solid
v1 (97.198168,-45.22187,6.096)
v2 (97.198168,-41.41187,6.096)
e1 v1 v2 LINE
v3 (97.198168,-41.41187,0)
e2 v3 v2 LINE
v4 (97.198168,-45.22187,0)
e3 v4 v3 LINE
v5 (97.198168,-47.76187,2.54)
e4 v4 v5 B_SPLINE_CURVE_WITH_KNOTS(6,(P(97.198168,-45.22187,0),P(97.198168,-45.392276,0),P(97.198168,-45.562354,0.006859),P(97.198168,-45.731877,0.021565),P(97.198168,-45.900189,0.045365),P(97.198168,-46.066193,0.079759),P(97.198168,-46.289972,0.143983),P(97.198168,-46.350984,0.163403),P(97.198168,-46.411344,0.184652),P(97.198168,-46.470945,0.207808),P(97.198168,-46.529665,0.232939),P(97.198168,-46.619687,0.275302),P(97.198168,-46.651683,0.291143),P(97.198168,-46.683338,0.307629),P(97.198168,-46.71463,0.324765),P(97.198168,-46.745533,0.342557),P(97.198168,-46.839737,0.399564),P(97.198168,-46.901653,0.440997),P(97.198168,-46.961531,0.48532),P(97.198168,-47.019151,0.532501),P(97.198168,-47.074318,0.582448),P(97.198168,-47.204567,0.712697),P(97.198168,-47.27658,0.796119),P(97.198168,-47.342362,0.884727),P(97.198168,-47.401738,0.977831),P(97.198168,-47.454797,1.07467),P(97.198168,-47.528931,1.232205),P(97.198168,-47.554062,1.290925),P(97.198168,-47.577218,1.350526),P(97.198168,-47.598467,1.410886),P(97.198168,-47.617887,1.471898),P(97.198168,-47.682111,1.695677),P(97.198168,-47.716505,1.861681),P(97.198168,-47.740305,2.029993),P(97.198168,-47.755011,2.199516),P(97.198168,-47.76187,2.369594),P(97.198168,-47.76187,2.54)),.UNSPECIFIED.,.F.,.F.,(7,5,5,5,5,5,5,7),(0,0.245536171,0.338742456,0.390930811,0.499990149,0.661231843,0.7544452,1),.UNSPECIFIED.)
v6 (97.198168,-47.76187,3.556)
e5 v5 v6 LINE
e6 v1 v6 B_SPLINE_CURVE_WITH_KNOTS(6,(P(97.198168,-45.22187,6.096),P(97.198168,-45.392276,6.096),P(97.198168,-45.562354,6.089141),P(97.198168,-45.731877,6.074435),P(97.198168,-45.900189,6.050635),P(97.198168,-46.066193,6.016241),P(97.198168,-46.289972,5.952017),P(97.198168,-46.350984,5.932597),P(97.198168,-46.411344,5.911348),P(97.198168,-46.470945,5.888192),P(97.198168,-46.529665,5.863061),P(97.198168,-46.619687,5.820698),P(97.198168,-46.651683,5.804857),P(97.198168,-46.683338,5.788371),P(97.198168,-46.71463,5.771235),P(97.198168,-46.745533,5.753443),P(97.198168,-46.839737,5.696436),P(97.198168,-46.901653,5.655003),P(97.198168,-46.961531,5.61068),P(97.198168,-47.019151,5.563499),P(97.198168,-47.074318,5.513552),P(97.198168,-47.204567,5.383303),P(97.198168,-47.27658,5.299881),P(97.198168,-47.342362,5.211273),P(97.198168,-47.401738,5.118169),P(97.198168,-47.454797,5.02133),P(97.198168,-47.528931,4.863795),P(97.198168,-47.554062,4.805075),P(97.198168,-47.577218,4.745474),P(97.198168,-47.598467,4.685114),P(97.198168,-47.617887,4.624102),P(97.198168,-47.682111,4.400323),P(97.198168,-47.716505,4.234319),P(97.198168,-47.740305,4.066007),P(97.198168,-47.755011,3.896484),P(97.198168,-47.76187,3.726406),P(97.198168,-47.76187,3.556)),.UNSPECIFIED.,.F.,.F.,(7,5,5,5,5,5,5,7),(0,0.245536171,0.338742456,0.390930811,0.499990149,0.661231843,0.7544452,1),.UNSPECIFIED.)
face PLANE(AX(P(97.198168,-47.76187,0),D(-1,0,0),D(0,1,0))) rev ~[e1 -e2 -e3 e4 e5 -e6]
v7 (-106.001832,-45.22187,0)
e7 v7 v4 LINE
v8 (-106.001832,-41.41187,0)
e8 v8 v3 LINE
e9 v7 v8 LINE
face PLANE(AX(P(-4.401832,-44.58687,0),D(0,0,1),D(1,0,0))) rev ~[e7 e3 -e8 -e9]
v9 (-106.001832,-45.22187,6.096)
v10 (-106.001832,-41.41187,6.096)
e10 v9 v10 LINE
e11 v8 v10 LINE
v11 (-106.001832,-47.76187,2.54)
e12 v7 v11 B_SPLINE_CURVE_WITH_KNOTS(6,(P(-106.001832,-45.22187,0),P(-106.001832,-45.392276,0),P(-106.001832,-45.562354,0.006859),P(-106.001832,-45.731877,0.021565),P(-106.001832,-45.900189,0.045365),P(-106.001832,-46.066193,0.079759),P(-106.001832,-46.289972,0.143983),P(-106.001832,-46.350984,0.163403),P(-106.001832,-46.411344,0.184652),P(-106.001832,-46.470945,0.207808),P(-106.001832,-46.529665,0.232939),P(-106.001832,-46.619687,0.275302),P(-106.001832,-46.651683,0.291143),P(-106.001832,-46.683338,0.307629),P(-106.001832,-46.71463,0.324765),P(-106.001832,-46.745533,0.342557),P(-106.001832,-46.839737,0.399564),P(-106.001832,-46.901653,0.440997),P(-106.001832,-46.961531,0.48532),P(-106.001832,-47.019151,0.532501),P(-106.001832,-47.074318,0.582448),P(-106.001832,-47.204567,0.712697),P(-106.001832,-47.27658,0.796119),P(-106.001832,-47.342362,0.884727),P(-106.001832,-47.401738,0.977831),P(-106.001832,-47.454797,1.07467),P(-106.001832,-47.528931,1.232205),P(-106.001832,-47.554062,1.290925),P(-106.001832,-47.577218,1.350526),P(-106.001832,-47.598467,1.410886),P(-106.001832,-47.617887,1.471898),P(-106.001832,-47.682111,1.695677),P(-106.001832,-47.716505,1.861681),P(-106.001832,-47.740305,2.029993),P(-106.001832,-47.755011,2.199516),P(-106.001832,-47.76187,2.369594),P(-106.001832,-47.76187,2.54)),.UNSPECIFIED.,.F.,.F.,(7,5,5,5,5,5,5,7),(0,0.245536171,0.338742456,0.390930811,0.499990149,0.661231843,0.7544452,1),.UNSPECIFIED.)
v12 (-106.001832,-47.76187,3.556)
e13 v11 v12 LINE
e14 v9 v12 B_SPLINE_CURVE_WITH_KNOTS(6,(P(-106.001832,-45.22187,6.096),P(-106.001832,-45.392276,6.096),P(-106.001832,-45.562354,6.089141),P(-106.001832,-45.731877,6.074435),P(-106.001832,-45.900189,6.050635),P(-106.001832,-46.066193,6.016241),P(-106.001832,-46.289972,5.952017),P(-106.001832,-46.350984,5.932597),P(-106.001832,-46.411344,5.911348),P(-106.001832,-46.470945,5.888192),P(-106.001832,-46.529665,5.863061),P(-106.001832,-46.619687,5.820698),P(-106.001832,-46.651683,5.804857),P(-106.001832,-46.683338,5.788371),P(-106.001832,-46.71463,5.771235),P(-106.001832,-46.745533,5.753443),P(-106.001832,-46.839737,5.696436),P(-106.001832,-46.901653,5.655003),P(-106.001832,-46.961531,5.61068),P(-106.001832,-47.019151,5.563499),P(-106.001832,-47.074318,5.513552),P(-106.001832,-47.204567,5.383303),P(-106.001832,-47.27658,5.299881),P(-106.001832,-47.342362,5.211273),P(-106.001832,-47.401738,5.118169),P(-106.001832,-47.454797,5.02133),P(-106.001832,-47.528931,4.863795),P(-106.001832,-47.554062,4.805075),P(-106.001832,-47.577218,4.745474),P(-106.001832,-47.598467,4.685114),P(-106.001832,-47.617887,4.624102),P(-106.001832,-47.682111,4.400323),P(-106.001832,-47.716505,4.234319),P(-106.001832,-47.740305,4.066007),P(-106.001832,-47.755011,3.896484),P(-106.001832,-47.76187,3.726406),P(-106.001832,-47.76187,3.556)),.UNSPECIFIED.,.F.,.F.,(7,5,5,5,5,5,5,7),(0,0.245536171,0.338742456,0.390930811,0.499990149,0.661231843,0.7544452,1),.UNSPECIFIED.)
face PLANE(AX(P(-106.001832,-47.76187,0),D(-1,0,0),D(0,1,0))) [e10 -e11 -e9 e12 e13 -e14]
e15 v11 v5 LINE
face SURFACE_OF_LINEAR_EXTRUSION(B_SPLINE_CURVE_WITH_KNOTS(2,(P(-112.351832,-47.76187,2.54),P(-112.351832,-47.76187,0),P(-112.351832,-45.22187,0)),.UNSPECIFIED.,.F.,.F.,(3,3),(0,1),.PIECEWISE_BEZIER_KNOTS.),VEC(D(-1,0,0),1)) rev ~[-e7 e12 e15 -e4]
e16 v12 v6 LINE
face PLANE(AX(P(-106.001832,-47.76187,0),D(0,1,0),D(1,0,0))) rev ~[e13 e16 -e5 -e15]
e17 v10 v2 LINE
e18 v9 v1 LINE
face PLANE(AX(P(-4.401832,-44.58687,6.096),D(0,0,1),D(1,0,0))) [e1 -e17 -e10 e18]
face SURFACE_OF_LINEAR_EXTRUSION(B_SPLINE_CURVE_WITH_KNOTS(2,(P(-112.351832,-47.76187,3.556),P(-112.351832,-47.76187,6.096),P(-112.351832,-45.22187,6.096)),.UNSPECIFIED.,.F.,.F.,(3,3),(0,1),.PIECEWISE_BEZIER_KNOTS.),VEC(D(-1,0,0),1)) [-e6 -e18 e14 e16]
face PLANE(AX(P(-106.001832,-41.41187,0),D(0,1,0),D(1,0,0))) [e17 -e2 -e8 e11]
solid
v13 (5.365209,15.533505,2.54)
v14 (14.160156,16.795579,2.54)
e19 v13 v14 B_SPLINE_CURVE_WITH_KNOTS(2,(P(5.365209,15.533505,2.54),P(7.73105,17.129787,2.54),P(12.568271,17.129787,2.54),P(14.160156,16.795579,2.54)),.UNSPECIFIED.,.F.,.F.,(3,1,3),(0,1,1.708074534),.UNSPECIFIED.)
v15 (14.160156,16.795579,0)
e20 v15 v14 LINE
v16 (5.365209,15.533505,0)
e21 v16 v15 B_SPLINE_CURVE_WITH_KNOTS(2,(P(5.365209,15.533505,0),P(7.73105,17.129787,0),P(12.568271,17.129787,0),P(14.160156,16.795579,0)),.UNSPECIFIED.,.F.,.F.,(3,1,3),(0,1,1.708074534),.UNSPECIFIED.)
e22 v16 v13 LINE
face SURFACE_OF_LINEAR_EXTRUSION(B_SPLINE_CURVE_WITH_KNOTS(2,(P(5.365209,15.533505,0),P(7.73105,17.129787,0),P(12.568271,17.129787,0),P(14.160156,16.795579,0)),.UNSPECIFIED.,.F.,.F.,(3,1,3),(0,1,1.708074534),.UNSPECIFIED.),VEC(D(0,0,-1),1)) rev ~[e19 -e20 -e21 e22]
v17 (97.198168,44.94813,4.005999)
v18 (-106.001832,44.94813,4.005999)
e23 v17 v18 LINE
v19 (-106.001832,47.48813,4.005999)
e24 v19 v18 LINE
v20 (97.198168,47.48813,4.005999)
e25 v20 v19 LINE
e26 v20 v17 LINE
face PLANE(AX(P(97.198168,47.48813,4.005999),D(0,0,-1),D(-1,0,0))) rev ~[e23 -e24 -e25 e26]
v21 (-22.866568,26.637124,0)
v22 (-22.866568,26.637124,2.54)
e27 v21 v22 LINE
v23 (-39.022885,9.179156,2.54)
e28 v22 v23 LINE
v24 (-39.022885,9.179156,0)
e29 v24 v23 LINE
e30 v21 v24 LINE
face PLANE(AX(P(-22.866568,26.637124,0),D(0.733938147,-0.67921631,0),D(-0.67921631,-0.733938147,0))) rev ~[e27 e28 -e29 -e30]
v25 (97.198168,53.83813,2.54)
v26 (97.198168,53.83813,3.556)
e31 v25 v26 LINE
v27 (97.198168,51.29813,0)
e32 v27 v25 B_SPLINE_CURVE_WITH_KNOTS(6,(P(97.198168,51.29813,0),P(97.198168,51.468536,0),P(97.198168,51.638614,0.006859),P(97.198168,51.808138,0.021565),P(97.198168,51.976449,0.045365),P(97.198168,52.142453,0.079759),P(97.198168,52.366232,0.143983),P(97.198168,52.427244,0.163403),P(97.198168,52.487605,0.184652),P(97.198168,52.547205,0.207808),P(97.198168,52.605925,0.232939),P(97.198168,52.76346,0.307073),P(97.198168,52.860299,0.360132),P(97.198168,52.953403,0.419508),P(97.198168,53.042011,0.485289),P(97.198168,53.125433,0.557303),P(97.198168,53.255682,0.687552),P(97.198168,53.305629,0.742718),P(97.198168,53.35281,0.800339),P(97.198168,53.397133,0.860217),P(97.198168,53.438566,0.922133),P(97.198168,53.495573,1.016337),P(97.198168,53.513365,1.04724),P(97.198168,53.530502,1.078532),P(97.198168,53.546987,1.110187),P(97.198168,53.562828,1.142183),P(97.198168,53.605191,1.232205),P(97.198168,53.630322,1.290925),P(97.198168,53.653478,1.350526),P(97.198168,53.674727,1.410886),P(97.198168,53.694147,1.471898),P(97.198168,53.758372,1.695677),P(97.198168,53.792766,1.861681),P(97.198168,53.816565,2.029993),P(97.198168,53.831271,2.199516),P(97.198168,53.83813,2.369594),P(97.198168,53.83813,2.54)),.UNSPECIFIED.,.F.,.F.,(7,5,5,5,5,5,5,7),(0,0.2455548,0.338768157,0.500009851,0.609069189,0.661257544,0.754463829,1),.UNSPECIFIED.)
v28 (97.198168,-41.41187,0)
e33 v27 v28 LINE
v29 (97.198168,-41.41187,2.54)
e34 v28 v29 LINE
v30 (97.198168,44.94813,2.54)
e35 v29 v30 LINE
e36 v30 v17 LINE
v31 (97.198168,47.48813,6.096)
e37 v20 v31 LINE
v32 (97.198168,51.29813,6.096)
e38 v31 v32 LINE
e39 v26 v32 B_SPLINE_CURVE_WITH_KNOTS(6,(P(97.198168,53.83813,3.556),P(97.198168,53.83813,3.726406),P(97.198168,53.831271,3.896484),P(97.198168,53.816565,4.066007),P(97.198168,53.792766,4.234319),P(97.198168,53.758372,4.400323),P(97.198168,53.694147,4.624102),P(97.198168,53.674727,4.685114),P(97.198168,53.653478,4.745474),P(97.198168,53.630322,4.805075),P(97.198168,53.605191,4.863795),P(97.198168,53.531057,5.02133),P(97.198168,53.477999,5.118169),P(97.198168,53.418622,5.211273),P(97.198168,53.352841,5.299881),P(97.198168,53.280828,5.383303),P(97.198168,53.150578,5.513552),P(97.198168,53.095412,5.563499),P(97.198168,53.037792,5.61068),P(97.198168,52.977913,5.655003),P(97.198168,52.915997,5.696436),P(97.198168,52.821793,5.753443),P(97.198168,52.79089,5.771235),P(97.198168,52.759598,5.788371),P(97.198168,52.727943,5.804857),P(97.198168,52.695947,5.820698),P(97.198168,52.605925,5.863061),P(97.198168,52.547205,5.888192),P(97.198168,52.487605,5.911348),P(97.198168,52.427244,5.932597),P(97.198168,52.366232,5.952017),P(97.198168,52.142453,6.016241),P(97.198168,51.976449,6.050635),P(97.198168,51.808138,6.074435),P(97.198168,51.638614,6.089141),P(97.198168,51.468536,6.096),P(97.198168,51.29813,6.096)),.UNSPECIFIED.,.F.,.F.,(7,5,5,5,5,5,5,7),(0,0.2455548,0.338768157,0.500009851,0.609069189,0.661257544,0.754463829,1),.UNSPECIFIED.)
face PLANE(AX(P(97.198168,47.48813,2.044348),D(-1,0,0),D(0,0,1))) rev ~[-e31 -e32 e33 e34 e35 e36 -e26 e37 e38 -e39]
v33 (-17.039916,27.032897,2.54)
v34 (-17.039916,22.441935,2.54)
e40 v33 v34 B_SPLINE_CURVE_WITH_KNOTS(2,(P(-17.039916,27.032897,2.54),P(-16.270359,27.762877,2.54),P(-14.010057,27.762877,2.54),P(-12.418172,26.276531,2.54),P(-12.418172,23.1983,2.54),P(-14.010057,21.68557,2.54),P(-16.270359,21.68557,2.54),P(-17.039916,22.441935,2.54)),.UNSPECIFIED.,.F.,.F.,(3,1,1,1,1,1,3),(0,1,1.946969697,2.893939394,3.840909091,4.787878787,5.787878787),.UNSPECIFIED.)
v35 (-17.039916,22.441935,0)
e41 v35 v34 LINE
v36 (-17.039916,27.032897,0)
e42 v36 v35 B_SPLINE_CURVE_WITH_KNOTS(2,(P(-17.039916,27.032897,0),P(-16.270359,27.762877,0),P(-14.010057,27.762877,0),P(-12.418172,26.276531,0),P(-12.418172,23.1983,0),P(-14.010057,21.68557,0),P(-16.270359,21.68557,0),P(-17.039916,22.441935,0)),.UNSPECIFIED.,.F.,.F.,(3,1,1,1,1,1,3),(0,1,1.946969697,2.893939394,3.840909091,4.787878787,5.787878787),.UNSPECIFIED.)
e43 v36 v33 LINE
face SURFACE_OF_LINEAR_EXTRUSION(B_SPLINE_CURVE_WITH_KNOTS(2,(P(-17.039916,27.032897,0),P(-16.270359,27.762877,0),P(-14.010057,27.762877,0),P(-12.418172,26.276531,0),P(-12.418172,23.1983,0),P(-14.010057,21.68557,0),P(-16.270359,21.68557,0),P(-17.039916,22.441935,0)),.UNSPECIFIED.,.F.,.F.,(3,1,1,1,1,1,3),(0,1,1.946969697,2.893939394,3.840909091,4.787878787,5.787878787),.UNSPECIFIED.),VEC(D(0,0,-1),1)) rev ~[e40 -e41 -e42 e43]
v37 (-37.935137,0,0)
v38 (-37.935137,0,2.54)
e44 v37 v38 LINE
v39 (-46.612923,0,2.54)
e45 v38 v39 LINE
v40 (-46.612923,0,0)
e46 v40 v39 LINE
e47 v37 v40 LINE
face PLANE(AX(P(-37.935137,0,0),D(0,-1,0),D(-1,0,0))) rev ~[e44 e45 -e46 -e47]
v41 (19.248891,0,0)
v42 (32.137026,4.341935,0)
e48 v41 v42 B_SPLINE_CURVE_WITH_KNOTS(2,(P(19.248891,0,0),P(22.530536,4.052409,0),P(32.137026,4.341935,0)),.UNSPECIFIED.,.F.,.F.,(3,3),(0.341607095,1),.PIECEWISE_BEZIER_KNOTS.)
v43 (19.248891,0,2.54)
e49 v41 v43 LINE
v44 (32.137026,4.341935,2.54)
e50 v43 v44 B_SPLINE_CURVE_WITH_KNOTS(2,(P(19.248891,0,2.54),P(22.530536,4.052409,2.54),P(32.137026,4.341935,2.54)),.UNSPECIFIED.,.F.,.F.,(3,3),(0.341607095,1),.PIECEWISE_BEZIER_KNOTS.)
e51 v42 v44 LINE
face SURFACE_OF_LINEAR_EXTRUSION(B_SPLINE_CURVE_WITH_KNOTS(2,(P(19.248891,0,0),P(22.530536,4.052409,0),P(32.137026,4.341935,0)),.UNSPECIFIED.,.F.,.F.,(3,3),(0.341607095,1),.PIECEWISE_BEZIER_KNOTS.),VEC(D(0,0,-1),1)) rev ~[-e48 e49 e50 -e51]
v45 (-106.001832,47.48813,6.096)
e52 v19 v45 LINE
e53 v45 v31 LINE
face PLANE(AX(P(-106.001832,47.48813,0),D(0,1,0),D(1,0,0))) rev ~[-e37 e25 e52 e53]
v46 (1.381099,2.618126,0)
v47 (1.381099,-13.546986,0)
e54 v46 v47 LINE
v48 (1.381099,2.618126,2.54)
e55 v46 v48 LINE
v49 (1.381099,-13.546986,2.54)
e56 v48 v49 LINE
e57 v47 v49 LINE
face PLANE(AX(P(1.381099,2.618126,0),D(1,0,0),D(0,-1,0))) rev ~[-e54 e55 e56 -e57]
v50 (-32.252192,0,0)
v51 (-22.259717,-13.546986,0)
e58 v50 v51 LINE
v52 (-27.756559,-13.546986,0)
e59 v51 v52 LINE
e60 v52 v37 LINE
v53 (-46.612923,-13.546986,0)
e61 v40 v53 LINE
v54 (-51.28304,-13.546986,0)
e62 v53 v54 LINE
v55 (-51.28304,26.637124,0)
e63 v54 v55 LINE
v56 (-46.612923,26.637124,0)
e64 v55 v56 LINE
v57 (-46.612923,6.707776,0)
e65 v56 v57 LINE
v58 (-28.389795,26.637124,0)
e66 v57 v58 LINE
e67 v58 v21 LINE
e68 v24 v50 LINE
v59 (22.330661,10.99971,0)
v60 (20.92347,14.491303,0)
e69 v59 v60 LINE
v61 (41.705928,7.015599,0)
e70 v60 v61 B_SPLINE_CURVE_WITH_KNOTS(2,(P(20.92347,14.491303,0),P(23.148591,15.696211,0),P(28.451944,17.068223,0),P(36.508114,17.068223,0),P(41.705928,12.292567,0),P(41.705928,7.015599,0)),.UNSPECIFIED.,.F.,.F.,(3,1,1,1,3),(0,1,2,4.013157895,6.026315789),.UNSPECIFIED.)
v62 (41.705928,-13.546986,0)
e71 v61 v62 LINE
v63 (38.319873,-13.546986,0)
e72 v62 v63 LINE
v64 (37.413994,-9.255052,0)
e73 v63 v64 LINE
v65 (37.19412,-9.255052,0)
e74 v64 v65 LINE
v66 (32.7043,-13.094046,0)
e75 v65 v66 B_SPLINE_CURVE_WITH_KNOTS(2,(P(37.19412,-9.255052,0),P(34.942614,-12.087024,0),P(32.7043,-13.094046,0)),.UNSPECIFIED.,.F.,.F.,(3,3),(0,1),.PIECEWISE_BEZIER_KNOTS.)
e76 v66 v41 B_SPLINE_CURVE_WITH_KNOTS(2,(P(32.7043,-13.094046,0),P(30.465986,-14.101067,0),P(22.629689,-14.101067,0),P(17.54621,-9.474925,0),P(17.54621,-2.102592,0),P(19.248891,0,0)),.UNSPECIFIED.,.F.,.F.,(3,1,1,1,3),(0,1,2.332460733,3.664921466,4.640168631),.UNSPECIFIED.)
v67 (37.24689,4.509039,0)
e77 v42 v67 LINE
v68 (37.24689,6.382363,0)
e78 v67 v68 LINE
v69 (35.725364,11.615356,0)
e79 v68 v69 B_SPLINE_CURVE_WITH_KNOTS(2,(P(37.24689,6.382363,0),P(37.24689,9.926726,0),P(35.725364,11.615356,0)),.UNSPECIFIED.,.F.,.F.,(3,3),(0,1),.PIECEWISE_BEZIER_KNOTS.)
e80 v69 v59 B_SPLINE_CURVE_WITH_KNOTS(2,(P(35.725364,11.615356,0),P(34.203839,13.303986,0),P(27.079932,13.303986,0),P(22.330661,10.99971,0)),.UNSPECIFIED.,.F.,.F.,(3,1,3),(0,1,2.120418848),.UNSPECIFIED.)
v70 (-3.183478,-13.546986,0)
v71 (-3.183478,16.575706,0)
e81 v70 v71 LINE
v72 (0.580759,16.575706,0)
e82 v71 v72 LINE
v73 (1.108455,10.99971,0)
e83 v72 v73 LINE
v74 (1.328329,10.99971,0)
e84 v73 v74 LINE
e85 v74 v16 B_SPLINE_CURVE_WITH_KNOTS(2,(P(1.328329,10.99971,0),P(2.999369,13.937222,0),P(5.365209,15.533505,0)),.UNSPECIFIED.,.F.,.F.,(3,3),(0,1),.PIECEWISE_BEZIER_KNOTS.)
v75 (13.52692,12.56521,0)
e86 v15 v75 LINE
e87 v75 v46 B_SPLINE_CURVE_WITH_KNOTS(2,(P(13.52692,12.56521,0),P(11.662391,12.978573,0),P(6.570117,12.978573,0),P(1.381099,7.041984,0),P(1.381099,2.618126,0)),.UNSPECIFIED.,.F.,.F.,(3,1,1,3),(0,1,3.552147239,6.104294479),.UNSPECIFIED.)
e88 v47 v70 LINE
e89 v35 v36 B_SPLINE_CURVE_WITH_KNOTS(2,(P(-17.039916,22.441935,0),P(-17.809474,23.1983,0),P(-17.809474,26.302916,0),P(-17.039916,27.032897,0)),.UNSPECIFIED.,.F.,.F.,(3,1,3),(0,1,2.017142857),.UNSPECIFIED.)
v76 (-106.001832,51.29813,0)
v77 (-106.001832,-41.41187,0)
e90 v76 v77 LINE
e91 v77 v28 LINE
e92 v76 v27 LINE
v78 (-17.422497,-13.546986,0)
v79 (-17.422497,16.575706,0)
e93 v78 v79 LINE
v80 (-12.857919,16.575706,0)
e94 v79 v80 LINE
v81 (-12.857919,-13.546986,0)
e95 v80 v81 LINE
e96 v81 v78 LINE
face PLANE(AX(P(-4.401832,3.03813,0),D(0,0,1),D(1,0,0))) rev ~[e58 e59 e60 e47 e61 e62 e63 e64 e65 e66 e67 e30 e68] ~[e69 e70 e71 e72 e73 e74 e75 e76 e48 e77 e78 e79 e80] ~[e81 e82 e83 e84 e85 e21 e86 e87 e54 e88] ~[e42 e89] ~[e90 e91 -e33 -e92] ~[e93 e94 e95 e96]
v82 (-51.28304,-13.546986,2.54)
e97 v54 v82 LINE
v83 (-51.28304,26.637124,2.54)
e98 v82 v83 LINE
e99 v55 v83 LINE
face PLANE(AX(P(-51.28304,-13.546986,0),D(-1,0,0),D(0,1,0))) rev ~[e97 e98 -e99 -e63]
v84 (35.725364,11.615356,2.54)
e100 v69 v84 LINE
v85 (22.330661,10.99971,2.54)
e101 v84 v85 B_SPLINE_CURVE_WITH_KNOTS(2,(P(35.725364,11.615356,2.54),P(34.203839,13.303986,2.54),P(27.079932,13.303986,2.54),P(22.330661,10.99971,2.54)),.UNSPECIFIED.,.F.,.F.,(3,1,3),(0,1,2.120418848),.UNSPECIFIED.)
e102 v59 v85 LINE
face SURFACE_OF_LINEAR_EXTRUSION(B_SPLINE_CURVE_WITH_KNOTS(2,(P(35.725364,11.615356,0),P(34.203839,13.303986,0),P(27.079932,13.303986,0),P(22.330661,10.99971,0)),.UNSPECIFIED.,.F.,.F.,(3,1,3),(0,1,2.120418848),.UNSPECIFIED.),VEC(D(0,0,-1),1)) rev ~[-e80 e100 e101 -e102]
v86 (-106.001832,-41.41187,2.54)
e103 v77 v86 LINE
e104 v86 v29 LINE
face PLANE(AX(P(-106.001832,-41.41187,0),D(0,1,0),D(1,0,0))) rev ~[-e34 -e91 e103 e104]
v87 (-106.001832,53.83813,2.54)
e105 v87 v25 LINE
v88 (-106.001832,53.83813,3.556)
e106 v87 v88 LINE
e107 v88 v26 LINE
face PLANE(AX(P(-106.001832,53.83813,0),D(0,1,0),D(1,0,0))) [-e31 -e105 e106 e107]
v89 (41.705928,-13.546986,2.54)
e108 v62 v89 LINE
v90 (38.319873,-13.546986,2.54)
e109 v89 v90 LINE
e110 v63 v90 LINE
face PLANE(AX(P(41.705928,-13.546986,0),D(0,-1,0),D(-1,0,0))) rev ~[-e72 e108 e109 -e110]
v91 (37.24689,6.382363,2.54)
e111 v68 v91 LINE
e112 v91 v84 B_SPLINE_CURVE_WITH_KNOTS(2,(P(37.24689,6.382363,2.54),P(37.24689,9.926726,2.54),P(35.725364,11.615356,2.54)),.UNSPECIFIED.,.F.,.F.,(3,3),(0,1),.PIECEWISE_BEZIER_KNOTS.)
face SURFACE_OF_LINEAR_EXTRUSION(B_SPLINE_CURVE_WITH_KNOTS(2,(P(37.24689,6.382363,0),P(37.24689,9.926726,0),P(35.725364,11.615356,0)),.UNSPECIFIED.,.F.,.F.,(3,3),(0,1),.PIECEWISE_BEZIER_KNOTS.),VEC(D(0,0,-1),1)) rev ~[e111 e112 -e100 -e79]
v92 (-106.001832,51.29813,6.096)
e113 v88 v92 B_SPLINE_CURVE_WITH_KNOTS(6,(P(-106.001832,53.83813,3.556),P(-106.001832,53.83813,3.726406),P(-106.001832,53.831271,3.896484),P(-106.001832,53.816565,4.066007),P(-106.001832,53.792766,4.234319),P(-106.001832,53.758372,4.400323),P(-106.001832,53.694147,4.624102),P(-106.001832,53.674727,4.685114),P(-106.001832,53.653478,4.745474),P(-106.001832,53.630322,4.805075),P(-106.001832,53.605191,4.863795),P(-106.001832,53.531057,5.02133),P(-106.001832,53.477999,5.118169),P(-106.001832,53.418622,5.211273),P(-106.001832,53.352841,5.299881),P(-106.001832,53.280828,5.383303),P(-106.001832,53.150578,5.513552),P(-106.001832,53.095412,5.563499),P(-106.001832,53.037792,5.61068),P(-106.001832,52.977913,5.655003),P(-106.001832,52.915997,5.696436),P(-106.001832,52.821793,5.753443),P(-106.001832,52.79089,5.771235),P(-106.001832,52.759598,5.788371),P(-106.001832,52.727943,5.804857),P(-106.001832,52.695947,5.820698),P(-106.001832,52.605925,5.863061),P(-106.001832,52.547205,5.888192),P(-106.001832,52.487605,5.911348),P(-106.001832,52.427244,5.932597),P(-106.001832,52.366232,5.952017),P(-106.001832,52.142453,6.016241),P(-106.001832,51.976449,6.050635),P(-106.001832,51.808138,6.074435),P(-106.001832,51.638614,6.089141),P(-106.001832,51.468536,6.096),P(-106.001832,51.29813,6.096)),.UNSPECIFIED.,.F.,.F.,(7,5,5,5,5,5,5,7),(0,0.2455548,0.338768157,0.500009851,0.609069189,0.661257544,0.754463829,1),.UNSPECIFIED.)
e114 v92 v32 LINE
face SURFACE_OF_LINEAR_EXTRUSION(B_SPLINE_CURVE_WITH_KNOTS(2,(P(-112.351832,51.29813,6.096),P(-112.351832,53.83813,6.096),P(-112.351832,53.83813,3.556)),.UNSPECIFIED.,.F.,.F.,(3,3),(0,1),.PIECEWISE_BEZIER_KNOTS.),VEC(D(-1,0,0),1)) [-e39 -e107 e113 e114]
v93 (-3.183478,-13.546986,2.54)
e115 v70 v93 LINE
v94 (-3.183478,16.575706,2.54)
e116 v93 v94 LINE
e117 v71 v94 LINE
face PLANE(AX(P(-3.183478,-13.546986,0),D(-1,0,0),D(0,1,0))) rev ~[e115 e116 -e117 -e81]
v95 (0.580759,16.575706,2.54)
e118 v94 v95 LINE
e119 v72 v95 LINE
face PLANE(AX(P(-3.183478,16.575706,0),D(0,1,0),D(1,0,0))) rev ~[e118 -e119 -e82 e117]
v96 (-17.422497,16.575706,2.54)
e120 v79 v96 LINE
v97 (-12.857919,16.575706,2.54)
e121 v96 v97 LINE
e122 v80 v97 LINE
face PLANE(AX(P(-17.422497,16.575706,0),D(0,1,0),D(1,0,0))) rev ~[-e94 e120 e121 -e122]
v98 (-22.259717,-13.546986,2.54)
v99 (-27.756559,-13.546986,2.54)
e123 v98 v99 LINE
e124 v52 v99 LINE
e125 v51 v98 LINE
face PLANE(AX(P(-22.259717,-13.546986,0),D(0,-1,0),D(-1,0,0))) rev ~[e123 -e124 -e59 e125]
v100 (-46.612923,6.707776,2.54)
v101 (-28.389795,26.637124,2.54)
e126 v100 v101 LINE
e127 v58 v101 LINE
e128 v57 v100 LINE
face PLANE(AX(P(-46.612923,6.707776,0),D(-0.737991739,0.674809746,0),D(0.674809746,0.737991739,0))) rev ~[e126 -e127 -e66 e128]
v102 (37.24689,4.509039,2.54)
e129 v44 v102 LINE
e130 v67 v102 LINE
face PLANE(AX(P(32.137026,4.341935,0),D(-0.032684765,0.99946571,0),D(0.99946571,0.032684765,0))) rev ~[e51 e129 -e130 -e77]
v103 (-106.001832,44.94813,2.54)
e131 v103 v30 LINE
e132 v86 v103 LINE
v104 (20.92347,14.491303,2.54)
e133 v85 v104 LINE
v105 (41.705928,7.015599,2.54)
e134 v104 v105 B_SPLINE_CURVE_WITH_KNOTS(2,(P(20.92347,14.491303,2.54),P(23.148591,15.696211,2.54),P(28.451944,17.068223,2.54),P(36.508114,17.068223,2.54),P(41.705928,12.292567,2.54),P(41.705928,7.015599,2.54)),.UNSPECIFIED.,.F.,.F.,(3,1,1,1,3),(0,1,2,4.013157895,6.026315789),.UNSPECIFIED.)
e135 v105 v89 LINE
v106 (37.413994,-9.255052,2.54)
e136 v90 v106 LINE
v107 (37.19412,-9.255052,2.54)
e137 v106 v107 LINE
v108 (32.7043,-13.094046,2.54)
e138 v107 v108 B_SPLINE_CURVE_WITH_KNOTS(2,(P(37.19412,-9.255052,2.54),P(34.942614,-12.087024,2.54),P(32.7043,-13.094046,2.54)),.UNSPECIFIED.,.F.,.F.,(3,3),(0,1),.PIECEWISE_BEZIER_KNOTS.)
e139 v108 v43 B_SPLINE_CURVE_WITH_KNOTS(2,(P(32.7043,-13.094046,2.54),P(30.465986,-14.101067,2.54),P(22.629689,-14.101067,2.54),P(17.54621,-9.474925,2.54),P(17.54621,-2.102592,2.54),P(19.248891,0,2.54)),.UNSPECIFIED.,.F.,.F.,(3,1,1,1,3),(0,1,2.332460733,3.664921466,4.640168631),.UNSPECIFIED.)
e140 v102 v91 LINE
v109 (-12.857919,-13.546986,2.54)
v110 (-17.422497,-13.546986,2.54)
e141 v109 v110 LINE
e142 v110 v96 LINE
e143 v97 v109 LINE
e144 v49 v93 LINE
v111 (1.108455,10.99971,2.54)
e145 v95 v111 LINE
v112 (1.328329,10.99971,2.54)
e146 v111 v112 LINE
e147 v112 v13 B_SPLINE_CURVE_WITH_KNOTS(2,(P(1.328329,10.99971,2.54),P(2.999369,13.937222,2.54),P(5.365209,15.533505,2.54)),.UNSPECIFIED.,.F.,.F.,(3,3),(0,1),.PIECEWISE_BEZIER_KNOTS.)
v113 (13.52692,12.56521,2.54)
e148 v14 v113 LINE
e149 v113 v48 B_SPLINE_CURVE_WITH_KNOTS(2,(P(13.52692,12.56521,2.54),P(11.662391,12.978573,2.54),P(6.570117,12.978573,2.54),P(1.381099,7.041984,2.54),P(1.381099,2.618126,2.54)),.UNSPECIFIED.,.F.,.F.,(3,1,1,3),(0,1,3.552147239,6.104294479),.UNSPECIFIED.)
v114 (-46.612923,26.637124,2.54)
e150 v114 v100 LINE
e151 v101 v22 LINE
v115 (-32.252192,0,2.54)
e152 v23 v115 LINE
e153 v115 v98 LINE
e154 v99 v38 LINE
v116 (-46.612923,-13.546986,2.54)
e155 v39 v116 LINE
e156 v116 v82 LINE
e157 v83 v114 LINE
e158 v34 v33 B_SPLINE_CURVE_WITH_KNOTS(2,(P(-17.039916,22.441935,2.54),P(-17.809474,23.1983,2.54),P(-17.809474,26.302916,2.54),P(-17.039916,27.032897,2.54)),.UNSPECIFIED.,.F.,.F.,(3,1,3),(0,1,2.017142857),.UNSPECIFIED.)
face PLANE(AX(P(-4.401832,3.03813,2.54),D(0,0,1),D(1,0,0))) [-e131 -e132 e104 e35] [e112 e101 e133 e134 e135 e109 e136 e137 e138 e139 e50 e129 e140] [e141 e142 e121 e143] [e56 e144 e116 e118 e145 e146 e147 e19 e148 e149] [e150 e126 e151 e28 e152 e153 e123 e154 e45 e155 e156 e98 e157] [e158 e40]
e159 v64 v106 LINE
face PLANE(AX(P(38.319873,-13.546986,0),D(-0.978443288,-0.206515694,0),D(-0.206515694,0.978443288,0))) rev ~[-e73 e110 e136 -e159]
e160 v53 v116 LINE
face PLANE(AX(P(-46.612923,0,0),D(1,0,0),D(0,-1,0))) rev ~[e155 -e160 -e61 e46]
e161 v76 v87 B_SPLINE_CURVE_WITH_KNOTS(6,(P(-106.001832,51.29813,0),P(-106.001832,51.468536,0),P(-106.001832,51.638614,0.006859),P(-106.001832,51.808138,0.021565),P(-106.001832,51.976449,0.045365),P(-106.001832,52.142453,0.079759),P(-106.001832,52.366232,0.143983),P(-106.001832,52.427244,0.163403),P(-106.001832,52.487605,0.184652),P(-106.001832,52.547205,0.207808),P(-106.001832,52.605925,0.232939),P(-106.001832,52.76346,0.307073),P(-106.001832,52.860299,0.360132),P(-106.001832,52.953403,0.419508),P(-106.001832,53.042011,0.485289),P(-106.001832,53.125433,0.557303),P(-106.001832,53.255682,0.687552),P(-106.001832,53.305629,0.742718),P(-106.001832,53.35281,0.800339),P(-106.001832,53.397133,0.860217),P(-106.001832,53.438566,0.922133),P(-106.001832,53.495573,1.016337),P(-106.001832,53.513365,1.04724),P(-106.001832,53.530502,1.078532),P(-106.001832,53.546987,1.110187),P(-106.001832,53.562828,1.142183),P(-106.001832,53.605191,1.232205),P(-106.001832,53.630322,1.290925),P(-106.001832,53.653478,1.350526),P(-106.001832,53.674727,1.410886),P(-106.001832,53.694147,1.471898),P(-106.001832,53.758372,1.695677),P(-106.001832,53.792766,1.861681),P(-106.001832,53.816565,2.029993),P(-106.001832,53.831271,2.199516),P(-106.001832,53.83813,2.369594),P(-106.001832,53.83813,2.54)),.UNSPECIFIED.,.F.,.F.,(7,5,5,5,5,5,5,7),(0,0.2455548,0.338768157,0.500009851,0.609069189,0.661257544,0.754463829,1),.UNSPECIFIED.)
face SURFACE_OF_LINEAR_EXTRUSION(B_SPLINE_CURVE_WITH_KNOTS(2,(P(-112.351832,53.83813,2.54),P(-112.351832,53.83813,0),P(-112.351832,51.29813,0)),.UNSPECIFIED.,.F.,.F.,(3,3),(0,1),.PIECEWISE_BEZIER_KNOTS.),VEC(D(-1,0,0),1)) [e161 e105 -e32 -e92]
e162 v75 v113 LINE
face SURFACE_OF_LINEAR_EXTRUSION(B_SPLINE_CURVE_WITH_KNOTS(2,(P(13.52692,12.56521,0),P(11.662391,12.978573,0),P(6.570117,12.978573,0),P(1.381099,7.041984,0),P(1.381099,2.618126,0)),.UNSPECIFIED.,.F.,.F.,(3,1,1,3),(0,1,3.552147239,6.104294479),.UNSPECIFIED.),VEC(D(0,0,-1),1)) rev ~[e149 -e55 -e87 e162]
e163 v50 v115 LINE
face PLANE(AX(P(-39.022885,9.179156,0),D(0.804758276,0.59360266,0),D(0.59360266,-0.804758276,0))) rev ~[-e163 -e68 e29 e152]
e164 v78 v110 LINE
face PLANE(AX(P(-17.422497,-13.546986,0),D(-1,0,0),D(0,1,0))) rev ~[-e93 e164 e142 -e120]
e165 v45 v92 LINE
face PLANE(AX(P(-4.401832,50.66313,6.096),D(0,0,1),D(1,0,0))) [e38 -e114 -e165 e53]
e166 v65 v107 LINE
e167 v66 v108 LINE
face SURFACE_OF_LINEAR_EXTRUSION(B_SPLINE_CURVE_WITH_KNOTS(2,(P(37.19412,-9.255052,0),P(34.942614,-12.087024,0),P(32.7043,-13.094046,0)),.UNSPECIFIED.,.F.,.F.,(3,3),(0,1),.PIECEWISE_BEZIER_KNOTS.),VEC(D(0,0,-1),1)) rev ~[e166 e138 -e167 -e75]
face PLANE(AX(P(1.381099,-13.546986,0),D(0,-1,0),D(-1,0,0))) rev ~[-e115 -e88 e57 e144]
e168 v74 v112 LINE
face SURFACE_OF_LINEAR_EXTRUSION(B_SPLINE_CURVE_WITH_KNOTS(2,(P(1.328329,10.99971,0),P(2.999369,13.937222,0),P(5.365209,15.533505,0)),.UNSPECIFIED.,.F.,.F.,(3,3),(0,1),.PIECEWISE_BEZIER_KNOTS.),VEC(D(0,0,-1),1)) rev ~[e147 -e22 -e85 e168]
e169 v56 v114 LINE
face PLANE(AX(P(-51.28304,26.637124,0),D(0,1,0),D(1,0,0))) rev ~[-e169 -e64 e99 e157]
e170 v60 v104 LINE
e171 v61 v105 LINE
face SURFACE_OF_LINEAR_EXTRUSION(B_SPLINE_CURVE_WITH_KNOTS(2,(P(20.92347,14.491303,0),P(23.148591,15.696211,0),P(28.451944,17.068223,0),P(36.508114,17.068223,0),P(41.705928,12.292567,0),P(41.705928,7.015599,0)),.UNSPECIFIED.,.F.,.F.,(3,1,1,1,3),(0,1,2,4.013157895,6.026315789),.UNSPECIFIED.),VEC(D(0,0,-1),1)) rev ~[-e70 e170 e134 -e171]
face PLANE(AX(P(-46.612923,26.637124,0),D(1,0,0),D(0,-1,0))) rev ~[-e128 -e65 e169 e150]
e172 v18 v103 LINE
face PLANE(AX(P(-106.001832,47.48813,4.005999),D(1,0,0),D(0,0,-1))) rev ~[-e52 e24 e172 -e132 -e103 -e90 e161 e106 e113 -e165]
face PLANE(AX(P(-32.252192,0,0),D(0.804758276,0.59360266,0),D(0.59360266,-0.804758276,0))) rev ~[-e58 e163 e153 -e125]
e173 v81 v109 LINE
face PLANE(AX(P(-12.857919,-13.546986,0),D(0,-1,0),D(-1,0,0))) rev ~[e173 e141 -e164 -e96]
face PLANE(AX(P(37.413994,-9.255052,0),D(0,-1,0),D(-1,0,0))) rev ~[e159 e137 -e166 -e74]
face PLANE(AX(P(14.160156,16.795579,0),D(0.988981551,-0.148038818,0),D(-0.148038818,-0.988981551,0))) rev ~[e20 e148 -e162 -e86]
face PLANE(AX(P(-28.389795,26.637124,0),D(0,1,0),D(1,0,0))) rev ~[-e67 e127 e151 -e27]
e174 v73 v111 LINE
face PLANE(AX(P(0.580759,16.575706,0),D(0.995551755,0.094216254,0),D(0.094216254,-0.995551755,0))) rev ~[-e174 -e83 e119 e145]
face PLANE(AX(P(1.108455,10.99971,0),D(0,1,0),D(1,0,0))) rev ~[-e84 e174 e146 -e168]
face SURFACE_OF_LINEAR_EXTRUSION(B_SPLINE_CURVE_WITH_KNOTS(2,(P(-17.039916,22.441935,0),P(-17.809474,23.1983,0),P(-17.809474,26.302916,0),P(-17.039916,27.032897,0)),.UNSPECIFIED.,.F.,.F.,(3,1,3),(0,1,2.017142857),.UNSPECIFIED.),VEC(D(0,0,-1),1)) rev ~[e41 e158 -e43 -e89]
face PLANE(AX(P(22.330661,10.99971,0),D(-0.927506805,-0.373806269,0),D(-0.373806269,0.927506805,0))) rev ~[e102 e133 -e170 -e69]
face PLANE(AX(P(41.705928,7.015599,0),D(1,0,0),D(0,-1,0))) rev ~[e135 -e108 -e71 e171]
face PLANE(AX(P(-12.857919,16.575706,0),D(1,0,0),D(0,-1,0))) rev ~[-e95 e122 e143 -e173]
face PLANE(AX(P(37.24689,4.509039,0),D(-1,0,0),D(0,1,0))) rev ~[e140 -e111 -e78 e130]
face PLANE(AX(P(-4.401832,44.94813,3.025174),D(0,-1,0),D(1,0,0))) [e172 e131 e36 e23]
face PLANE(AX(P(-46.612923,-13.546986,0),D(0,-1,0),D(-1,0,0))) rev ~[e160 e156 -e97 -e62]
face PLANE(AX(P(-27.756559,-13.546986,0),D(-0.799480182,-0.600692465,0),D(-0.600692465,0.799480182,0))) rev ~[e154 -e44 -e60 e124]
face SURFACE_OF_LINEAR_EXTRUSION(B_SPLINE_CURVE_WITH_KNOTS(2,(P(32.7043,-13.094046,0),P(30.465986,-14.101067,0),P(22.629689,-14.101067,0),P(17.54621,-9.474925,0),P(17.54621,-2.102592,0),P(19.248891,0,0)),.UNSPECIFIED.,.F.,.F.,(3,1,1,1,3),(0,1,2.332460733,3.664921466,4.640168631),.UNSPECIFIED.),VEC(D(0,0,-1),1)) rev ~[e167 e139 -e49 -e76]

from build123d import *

# Parameters (mm, degrees)
F0_W          = 203.2
F0_H          = 6.35
F1_DEPTH      = 6.096
F0_H_2        = 88.9
F2_DEPTH      = 2.54
F4_DEPTH      = 2.54
F5_T1_DEPTH   = 215.9
F5_2_T1_DEPTH = 215.9


# Not quite as in the source:
# - a fillet or chamfer that OpenCascade refuses, or shapes differently, is made with other operations: its cross-section is extruded or revolved along the edge and cut away or added


with BuildPart() as f1:
    # F0 (on Top) → F1 (new body)
    with BuildSketch(Plane.XY):
        with Locations((-4.4018315911, 50.6631300867)):
            Rectangle(F0_W, F0_H)
    extrude(amount=F1_DEPTH)



with BuildPart() as f1b:
    # F0 (on Top) → F1, piece 2 (new body)
    with BuildSketch(Plane.XY):
        with Locations((-4.4018315911, -44.5868699133)):
            Rectangle(F0_W, F0_H)
    extrude(amount=F1_DEPTH)

    # F5: fillet of radius 2.54 on 2 edges, made by hand

    # F5_s2 → F5_t1 (cut)
    with BuildSketch(Plane.YZ.offset(-112.3518315911)):
        with BuildLine():
            add(Edge.make_bspline(
                [(-47.7618699133, 3.556), (-47.7618699133, 6.096), (-45.2218699133, 6.096)],
                knots=[0, 0, 0, 1, 1, 1], degree=2, weights=[1, 1, 1]))
            Line((-45.2218699133, 6.096), (-47.7618699133, 6.096))
            Line((-47.7618699133, 6.096), (-47.7618699133, 3.556))
        make_face()
        with BuildLine():
            add(Edge.make_bspline(
                [(-47.7618699133, 2.54), (-47.7618699133, 0), (-45.2218699133, 0)],
                knots=[0, 0, 0, 1, 1, 1], degree=2, weights=[1, 1, 1]))
            Line((-45.2218699133, 0), (-47.7618699133, 0))
            Line((-47.7618699133, 0), (-47.7618699133, 2.54))
        make_face()
    extrude(amount=F5_T1_DEPTH, mode=Mode.SUBTRACT)


with BuildPart() as f2:
    # F0 (on Top) → F2 (new body)
    with BuildSketch(Plane.XY):
        with Locations((-4.4018315911, 3.0381300867)):
            Rectangle(F0_W, F0_H_2)
        Polygon((-12.8579193956, 16.5757056756), (-12.8579193956, 0), (-12.8579193956, -13.5469855741), (-17.4224965514, -13.5469855741), (-17.4224965514, 0), (-17.4224965514, 16.5757056756), align=None, mode=Mode.SUBTRACT)
        with BuildLine():
            Line((-3.1834784103, -13.5469855741), (-3.1834784103, 0))
            Line((-3.1834784103, 0), (-3.1834784103, 16.5757056756))
            Line((-3.1834784103, 16.5757056756), (0.5807586276, 16.5757056756))
            Line((0.5807586276, 16.5757056756), (1.1084554086, 10.9997096895))
            Line((1.1084554086, 10.9997096895), (1.3283290674, 10.9997096895))
            add(Edge.make_bspline(
                [(1.3283290674, 10.9997096895), (2.9993688739, 13.9372217705), (5.3652094422, 15.5335045331)],
                knots=[0, 0, 0, 1, 1, 1], degree=2))
            add(Edge.make_bspline(
                [(5.3652094422, 15.5335045331), (7.7310500104, 17.1297872956), (10.5630227352, 17.1297872956)],
                knots=[0, 0, 0, 1, 1, 1], degree=2))
            add(Edge.make_bspline(
                [(10.5630227352, 17.1297872956), (12.568270503, 17.1297872956), (14.1601557924, 16.7955793343)],
                knots=[0, 0, 0, 1, 1, 1], degree=2))
            Line((14.1601557924, 16.7955793343), (13.5269196552, 12.5652101399))
            add(Edge.make_bspline(
                [(13.5269196552, 12.5652101399), (11.6623910289, 12.9785726183), (10.2288147739, 12.9785726183)],
                knots=[0, 0, 0, 1, 1, 1], degree=2))
            add(Edge.make_bspline(
                [(10.2288147739, 12.9785726183), (6.5701170921, 12.9785726183), (3.9756079188, 10.0102782251)],
                knots=[0, 0, 0, 1, 1, 1], degree=2))
            add(Edge.make_bspline(
                [(3.9756079188, 10.0102782251), (1.3810987455, 7.0419838319), (1.3810987455, 2.6181258177)],
                knots=[0, 0, 0, 1, 1, 1], degree=2))
            Line((1.3810987455, 2.6181258177), (1.3810987455, 0))
            Line((1.3810987455, 0), (1.3810987455, -13.5469855741))
            Line((1.3810987455, -13.5469855741), (-3.1834784103, -13.5469855741))
        make_face(mode=Mode.SUBTRACT)
        with BuildLine():
            add(Edge.make_bspline(
                [(17.5462101373, -5.2181713804), (17.5462101373, -2.1025919099), (19.248891356, 0)],
                knots=[0, 0, 0, 0.3416070953, 0.3416070953, 0.3416070953], degree=2))
            add(Edge.make_bspline(
                [(19.248891356, 0), (22.5305364068, 4.0524087886), (32.1370261324, 4.3419353024)],
                knots=[0.3416070953, 0.3416070953, 0.3416070953, 1, 1, 1], degree=2))
            Line((32.1370261324, 4.3419353024), (37.2468899619, 4.509039283))
            Line((37.2468899619, 4.509039283), (37.2468899619, 6.3823628556))
            add(Edge.make_bspline(
                [(37.2468899619, 6.3823628556), (37.2468899619, 9.9267262348), (35.7253642433, 11.615355934)],
                knots=[0, 0, 0, 1, 1, 1], degree=2))
            add(Edge.make_bspline(
                [(35.7253642433, 11.615355934), (34.2038385247, 13.3039856333), (30.8441690189, 13.3039856333)],
                knots=[0, 0, 0, 1, 1, 1], degree=2))
            add(Edge.make_bspline(
                [(30.8441690189, 13.3039856333), (27.079931981, 13.3039856333), (22.3306609518, 10.9997096895)],
                knots=[0, 0, 0, 1, 1, 1], degree=2))
            Line((22.3306609518, 10.9997096895), (20.9234695358, 14.4913033906))
            add(Edge.make_bspline(
                [(20.9234695358, 14.4913033906), (23.1485909624, 15.6962110406), (25.800267287, 16.3822168559)],
                knots=[0, 0, 0, 1, 1, 1], degree=2))
            add(Edge.make_bspline(
                [(25.800267287, 16.3822168559), (28.4519436116, 17.0682226712), (31.1256073021, 17.0682226712)],
                knots=[0, 0, 0, 1, 1, 1], degree=2))
            add(Edge.make_bspline(
                [(31.1256073021, 17.0682226712), (36.5081144684, 17.0682226712), (39.1070211149, 14.6803947371)],
                knots=[0, 0, 0, 1, 1, 1], degree=2))
            add(Edge.make_bspline(
                [(39.1070211149, 14.6803947371), (41.7059277614, 12.292566803), (41.7059277614, 7.0155989928)],
                knots=[0, 0, 0, 1, 1, 1], degree=2))
            Line((41.7059277614, 7.0155989928), (41.7059277614, 0))
            Line((41.7059277614, 0), (41.7059277614, -13.5469855741))
            Line((41.7059277614, -13.5469855741), (38.3198734166, -13.5469855741))
            Line((38.3198734166, -13.5469855741), (37.4139939425, -9.2550517551))
            Line((37.4139939425, -9.2550517551), (37.1941202838, -9.2550517551))
            add(Edge.make_bspline(
                [(37.1941202838, -9.2550517551), (34.9426140181, -12.0870244799), (32.7043001719, -13.094045837)],
                knots=[0, 0, 0, 1, 1, 1], degree=2))
            add(Edge.make_bspline(
                [(32.7043001719, -13.094045837), (30.4659863258, -14.1010671941), (27.10631682, -14.1010671941)],
                knots=[0, 0, 0, 1, 1, 1], degree=2))
            add(Edge.make_bspline(
                [(27.10631682, -14.1010671941), (22.6296891277, -14.1010671941), (20.0879496325, -11.787996304)],
                knots=[0, 0, 0, 1, 1, 1], degree=2))
            add(Edge.make_bspline(
                [(20.0879496325, -11.787996304), (17.5462101373, -9.4749254139), (17.5462101373, -5.2181713804)],
                knots=[0, 0, 0, 1, 1, 1], degree=2))
        make_face(mode=Mode.SUBTRACT)
        Polygon((-39.0228847876, 9.179155795), (-32.2521916973, 0), (-22.259717044, -13.5469855741), (-27.7565585129, -13.5469855741), (-37.9351374754, 0), (-46.6129234879, 0), (-46.6129234879, -13.5469855741), (-51.2830399999, -13.5469855741), (-51.2830399999, 0), (-51.2830399999, 26.6371243003), (-46.6129234879, 26.6371243003), (-46.6129234879, 6.7077758706), (-28.3897946501, 26.6371243003), (-22.8665683422, 26.6371243003), align=None, mode=Mode.SUBTRACT)
        with BuildLine():
            add(Edge.make_bspline(
                [(-17.0399163851, 22.4419348912), (-17.8094741908, 23.1983002773), (-17.8094741908, 24.7374158886)],
                knots=[0, 0, 0, 1, 1, 1], degree=2))
            add(Edge.make_bspline(
                [(-17.8094741908, 24.7374158886), (-17.8094741908, 26.302916339), (-17.0399163851, 27.032896886)],
                knots=[0, 0, 0, 1, 1, 1], degree=2))
            add(Edge.make_bspline(
                [(-17.0399163851, 27.032896886), (-16.2703585795, 27.7628774331), (-15.1094256612, 27.7628774331)],
                knots=[0, 0, 0, 1, 1, 1], degree=2))
            add(Edge.make_bspline(
                [(-15.1094256612, 27.7628774331), (-14.0100573675, 27.7628774331), (-13.2141147228, 27.0197044665)],
                knots=[0, 0, 0, 1, 1, 1], degree=2))
            add(Edge.make_bspline(
                [(-13.2141147228, 27.0197044665), (-12.4181720781, 26.2765314999), (-12.4181720781, 24.7374158886)],
                knots=[0, 0, 0, 1, 1, 1], degree=2))
            add(Edge.make_bspline(
                [(-12.4181720781, 24.7374158886), (-12.4181720781, 23.1983002773), (-13.2141147228, 22.4419348912)],
                knots=[0, 0, 0, 1, 1, 1], degree=2))
            add(Edge.make_bspline(
                [(-13.2141147228, 22.4419348912), (-14.0100573675, 21.6855695051), (-15.1094256612, 21.6855695051)],
                knots=[0, 0, 0, 1, 1, 1], degree=2))
            add(Edge.make_bspline(
                [(-15.1094256612, 21.6855695051), (-16.2703585795, 21.6855695051), (-17.0399163851, 22.4419348912)],
                knots=[0, 0, 0, 1, 1, 1], degree=2))
        make_face(mode=Mode.SUBTRACT)
    extrude(amount=F2_DEPTH)


with BuildPart() as f1_1:
    add(f1.part)

    add(f2.part)  # F4 merges F2
    # F3 (on face) → F4 (join)
    with BuildSketch(Plane.XZ.offset(-47.4881300867)):
        Polygon((97.1981684089, 4.0059988387), (-106.0018315911, 4.0059988387), (-106.0018315911, 2.044348279), (-48.8064140081, 2.044348279), (97.1981684089, 2.044348279), align=None)
    extrude(amount=F4_DEPTH)

    # F5#2: fillet of radius 2.54 on 2 edges, made by hand

    # F5_2_s2 → F5_2_t1 (cut)
    with BuildSketch(Plane.YZ.offset(-112.3518315911)):
        with BuildLine():
            add(Edge.make_bspline(
                [(51.2981300867, 6.096), (53.8381300867, 6.096), (53.8381300867, 3.556)],
                knots=[0, 0, 0, 1, 1, 1], degree=2, weights=[1, 1, 1]))
            Line((53.8381300867, 3.556), (53.8381300867, 6.096))
            Line((53.8381300867, 6.096), (51.2981300867, 6.096))
        make_face()
        with BuildLine():
            add(Edge.make_bspline(
                [(53.8381300867, 2.54), (53.8381300867, 0), (51.2981300867, 0)],
                knots=[0, 0, 0, 1, 1, 1], degree=2, weights=[1, 1, 1]))
            Line((51.2981300867, 0), (53.8381300867, 0))
            Line((53.8381300867, 0), (53.8381300867, 2.54))
        make_face()
    extrude(amount=F5_2_T1_DEPTH, mode=Mode.SUBTRACT)


solid = Compound([f1b.part, f1_1.part])
